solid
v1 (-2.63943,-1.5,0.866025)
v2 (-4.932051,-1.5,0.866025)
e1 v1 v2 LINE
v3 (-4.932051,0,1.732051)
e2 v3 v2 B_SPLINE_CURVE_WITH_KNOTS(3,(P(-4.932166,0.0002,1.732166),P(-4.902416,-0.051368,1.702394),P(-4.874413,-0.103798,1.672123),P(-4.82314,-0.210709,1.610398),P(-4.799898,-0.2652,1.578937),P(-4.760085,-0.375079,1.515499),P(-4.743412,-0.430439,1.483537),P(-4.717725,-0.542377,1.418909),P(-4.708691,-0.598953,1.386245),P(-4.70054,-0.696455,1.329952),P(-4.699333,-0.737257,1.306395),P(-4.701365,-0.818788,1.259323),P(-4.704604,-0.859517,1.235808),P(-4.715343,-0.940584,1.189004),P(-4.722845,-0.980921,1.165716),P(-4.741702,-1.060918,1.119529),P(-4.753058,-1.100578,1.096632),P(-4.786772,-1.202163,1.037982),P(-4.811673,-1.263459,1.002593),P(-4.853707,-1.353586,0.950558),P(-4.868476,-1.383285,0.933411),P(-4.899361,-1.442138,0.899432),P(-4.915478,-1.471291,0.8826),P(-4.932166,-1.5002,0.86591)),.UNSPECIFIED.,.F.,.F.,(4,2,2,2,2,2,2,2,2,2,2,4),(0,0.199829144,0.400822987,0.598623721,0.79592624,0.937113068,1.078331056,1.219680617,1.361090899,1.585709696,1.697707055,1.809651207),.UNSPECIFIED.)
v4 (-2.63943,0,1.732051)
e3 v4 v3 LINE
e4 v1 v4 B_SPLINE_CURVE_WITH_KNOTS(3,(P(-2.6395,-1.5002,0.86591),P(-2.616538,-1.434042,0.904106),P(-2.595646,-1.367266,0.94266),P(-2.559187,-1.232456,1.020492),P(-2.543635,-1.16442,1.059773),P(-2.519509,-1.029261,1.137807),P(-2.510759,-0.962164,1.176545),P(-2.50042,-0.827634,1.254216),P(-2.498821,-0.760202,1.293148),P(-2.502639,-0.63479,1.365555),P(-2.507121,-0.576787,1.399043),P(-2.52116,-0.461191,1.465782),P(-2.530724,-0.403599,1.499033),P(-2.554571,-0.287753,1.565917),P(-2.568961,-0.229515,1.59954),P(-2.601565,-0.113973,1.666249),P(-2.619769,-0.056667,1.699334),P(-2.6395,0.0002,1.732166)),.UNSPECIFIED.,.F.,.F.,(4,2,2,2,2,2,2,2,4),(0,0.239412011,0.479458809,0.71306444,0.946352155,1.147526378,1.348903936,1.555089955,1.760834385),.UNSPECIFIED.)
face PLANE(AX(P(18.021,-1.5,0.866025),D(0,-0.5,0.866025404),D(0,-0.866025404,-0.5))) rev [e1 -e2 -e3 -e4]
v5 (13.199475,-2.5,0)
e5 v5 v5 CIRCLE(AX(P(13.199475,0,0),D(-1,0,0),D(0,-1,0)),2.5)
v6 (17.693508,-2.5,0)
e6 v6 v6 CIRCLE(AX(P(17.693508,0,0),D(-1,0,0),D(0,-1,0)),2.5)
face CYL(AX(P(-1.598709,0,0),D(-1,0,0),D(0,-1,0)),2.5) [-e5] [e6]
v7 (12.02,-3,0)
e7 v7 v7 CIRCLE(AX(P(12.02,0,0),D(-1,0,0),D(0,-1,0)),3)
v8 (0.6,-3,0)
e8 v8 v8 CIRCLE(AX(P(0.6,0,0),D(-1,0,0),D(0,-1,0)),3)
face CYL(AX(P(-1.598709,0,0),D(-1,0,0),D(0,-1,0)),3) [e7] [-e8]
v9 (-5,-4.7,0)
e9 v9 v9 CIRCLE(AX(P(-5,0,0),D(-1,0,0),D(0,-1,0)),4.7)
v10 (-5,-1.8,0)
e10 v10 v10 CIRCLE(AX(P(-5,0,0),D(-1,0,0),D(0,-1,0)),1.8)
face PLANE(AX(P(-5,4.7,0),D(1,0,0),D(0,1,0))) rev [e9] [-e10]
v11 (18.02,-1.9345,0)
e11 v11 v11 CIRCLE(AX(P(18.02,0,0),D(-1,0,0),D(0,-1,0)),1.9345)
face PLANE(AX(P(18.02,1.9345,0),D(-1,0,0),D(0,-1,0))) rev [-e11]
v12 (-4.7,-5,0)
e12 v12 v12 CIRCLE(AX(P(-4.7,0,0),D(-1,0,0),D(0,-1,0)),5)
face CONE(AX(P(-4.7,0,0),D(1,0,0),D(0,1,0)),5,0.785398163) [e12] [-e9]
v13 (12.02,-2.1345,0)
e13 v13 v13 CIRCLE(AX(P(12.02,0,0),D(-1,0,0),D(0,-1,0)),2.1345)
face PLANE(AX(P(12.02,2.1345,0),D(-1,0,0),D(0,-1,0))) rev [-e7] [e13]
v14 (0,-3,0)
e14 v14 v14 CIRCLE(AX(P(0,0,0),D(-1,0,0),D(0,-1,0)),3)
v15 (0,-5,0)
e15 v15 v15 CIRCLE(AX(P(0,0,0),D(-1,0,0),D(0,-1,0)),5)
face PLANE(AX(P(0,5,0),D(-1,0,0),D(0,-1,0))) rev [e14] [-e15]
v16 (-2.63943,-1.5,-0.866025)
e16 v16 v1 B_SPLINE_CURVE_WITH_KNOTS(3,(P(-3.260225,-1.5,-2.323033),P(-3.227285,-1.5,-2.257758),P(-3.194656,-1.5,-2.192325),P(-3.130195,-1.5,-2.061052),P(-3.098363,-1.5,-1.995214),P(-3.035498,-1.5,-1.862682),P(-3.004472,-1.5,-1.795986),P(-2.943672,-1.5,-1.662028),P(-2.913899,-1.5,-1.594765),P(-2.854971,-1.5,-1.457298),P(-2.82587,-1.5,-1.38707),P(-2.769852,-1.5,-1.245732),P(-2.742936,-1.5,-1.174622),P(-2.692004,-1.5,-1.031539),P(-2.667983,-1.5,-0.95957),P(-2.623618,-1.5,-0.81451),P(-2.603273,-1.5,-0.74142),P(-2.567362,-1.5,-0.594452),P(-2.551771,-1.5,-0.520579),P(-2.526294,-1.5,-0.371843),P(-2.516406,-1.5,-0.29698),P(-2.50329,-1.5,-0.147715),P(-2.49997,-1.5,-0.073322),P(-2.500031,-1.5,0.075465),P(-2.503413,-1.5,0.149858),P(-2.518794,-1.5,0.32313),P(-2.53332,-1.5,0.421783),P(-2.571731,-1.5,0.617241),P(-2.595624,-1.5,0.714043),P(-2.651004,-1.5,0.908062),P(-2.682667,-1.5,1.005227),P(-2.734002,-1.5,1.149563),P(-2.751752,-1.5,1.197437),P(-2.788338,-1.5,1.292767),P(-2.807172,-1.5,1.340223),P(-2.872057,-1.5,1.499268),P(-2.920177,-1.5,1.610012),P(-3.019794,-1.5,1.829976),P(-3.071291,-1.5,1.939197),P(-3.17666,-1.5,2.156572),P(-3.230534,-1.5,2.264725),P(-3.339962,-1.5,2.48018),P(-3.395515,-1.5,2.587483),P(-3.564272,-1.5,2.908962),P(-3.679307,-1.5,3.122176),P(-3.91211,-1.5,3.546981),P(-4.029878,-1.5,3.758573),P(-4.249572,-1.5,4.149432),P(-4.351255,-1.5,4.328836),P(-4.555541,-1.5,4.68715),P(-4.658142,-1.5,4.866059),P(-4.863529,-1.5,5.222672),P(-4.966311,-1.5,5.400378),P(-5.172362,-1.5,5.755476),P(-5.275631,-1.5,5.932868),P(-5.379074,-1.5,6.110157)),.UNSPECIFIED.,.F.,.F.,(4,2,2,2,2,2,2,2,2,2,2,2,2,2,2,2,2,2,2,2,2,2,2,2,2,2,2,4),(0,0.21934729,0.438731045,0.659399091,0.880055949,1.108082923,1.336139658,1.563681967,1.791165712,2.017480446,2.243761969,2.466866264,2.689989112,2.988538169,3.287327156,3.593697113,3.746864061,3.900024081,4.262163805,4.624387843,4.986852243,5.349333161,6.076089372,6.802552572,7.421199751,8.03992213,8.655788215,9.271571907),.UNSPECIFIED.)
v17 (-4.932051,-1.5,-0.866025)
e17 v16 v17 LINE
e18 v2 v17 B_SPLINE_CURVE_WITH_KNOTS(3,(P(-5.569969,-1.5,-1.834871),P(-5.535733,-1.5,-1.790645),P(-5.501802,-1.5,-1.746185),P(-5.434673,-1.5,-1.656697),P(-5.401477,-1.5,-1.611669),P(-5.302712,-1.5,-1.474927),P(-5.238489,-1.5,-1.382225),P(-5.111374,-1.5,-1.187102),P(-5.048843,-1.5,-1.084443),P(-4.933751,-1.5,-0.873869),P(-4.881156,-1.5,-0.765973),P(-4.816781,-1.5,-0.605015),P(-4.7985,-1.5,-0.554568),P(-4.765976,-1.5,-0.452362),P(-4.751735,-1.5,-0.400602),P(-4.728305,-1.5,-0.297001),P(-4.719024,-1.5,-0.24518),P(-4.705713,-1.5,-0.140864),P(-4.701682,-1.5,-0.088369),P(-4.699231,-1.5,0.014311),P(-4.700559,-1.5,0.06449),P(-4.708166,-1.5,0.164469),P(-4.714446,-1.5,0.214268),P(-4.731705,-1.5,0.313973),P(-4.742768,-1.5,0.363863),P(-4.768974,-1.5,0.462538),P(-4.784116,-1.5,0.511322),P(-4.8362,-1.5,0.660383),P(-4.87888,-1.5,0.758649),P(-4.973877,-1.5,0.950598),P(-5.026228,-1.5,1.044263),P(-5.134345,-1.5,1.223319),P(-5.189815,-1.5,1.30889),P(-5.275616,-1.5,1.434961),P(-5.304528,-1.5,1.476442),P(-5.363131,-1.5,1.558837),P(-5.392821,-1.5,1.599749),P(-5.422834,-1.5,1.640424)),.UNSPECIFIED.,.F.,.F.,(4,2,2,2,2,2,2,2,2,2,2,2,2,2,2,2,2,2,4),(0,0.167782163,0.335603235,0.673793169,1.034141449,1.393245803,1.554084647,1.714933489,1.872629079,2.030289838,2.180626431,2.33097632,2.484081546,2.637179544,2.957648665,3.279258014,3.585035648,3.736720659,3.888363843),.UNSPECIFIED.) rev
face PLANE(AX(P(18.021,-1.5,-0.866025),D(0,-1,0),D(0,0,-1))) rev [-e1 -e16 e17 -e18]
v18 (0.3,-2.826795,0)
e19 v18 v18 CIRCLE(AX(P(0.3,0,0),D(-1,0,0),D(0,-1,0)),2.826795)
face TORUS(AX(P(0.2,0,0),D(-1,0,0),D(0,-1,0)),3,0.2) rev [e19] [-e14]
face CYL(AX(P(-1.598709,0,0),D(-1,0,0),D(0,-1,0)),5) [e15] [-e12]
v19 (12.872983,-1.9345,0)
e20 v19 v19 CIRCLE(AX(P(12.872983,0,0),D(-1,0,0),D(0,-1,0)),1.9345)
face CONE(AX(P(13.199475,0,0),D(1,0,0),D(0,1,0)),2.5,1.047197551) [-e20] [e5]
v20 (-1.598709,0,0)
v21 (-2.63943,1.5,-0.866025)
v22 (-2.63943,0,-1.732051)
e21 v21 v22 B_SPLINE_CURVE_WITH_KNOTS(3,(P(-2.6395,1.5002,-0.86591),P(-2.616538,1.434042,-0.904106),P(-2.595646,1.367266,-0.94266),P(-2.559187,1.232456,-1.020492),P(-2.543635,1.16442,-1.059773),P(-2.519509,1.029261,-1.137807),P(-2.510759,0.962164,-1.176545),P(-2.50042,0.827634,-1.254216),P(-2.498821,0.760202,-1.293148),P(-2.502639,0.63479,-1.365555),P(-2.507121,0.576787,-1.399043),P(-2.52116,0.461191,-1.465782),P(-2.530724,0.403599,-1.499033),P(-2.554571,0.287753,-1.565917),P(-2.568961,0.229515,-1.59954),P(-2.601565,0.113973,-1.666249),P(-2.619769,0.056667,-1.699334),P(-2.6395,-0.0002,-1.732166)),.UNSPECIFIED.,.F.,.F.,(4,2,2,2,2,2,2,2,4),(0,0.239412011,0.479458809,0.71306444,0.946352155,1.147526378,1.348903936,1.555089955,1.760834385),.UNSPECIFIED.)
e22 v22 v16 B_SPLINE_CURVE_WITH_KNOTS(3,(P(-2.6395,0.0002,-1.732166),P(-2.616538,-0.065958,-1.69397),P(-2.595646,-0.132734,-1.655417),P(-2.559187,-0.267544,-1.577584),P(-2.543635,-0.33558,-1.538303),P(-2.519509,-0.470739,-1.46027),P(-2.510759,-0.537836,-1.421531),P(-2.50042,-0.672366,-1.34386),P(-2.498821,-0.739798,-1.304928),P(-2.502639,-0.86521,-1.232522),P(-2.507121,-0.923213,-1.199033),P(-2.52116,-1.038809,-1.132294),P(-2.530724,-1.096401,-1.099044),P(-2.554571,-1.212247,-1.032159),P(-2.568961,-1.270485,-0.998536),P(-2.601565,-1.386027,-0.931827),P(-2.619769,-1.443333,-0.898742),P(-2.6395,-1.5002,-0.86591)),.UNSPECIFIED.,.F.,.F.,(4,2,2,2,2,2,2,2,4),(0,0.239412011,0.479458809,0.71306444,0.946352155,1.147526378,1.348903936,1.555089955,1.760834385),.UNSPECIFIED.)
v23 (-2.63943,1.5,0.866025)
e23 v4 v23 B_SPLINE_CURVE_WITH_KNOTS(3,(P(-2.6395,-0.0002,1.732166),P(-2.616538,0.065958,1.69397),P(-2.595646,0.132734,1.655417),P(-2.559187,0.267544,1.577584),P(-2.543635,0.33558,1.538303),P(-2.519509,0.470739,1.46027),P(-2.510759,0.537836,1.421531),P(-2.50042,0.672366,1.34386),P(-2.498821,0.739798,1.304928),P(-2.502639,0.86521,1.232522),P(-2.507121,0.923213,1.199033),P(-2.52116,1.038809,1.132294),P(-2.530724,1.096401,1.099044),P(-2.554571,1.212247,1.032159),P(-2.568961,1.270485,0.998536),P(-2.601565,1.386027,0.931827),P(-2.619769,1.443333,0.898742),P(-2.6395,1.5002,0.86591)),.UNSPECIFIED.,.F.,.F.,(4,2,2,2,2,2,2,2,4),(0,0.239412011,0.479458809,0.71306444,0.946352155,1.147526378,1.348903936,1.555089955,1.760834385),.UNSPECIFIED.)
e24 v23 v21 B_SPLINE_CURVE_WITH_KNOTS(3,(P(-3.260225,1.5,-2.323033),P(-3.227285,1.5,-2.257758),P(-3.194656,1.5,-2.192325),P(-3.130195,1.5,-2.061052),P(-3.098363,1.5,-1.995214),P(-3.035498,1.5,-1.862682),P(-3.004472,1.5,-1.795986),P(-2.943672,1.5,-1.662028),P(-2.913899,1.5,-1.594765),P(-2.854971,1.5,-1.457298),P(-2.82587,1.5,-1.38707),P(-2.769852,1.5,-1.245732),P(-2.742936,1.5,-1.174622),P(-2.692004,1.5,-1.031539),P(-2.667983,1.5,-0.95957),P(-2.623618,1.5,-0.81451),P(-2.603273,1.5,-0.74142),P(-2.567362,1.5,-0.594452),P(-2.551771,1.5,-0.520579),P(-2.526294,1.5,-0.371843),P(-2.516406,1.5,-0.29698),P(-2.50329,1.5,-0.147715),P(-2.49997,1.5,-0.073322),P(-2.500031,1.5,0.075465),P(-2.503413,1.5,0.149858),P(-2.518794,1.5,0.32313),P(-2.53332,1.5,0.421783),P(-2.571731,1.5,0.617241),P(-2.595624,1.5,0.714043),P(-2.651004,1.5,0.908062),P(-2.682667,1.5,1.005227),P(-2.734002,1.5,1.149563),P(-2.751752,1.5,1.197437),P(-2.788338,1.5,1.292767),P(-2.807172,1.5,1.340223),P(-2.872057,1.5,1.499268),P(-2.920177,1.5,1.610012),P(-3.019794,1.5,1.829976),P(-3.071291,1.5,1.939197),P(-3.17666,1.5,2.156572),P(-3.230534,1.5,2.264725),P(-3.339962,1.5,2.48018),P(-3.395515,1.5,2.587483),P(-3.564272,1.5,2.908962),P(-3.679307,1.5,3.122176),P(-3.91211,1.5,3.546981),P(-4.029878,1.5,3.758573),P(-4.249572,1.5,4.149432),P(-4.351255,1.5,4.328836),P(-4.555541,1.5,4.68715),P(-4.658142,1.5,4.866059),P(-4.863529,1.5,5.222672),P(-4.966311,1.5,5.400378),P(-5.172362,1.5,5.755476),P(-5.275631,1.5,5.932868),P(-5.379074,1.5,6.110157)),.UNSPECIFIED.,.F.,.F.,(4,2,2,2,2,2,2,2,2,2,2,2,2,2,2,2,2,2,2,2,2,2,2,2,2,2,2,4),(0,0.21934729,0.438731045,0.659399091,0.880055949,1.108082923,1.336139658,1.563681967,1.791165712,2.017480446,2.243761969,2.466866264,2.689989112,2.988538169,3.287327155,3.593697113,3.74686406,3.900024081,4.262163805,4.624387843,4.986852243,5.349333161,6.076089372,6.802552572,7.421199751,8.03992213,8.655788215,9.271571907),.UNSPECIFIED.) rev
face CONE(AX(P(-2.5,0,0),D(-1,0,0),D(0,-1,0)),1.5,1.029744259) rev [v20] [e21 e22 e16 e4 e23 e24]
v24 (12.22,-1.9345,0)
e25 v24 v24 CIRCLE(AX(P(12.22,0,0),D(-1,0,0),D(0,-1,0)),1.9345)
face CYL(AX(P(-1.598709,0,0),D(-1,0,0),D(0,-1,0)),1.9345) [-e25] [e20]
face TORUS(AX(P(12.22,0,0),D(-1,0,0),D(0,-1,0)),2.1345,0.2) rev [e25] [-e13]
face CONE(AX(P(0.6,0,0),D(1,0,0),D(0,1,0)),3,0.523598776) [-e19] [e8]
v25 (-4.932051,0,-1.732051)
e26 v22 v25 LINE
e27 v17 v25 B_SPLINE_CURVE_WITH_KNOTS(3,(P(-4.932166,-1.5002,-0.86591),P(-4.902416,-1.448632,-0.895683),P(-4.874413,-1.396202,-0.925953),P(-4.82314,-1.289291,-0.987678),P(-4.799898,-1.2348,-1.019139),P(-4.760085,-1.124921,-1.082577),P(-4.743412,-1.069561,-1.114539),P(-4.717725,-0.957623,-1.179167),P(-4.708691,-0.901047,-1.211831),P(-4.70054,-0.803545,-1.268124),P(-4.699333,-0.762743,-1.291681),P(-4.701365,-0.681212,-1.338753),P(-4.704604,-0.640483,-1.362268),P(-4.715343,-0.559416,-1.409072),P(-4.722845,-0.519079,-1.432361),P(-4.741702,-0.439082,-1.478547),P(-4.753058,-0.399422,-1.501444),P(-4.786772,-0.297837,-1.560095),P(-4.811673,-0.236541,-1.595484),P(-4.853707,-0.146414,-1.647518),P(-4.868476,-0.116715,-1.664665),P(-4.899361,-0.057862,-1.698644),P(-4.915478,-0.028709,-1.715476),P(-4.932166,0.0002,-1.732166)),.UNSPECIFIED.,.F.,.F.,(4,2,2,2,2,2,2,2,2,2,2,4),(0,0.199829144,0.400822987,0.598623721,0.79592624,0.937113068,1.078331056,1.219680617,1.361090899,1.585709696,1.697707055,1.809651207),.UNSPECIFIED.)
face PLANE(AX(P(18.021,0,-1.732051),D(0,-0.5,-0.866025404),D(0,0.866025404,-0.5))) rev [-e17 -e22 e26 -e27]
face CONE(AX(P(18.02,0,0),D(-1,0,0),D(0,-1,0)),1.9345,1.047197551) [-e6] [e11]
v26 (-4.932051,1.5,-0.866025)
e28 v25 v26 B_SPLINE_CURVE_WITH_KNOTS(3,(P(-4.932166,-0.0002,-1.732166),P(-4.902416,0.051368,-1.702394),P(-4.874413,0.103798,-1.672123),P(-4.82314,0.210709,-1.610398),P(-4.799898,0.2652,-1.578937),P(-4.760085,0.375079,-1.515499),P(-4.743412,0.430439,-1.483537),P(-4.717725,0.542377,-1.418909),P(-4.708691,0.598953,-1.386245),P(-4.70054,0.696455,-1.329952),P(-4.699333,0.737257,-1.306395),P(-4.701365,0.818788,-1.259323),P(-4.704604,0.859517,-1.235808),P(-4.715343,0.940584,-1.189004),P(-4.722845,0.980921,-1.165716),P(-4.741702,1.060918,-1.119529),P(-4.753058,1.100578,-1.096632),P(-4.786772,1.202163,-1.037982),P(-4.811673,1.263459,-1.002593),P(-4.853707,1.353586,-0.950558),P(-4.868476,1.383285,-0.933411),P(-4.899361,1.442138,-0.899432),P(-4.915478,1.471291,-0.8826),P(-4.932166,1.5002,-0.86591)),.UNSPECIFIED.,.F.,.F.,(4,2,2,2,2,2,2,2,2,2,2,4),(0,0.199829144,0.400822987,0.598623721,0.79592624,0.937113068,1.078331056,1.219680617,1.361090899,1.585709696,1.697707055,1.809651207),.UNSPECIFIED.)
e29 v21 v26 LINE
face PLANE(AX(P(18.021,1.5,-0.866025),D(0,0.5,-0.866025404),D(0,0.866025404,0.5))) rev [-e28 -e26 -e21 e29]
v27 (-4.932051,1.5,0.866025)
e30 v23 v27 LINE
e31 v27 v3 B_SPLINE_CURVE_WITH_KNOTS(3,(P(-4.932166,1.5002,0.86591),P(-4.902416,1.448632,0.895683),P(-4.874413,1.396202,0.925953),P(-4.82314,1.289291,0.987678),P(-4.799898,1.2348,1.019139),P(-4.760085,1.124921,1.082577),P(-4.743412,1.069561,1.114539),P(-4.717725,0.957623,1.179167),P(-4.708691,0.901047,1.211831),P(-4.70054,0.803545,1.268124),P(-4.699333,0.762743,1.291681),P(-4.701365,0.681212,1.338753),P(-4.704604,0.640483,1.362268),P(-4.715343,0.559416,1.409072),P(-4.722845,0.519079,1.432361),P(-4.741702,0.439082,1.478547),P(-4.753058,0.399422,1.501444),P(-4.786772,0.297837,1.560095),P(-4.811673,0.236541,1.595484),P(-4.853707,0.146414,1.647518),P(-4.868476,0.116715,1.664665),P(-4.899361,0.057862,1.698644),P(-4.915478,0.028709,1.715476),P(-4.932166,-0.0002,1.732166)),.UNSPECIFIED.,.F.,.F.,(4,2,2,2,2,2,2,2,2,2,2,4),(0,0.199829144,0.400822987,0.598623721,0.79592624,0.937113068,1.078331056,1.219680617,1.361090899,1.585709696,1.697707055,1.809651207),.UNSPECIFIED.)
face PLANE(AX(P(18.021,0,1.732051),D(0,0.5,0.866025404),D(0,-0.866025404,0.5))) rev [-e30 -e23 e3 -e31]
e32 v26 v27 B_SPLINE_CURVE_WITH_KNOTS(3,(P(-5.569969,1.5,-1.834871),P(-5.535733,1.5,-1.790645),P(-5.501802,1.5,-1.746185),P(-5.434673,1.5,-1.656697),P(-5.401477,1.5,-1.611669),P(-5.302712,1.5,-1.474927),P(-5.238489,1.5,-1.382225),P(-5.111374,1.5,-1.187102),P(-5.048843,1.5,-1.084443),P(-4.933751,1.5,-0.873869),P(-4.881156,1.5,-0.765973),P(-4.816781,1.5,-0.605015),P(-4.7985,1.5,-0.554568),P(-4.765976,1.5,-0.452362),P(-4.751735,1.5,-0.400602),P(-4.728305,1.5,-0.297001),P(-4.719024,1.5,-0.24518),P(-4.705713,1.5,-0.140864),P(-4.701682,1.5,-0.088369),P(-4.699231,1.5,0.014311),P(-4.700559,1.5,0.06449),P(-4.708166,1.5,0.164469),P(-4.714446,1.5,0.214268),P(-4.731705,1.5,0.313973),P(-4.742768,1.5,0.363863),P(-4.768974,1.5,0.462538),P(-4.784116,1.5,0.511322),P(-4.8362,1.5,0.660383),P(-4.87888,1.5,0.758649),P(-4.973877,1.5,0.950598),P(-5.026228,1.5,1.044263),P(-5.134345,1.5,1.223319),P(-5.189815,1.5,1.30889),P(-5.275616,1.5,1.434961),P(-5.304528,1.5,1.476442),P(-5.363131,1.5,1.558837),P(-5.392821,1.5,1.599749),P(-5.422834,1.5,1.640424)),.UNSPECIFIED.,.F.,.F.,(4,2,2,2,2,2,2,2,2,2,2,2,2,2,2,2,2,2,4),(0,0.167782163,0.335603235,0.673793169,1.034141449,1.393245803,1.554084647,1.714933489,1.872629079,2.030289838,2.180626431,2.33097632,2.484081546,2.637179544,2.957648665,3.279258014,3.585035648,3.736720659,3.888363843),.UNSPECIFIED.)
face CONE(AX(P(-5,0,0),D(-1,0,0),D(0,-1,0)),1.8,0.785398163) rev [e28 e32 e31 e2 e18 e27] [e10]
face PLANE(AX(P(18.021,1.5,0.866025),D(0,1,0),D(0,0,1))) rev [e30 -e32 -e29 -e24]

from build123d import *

# Parameters (mm, degrees)
HEXEXTRUDE_REACH = 26.082


with BuildPart() as part:
    # Sketch2 → ScrewRevolve (revolve)
    with BuildSketch(Plane.XY):
        with BuildLine():
            Line((18.02, 1.9345), (17.693508423, 2.5))
            Line((17.693508423, 2.5), (13.199474732, 2.5))
            Line((13.199474732, 2.5), (12.872983154, 1.9345))
            Line((12.872983154, 1.9345), (12.22, 1.9345))
            ThreePointArc((12.22, 1.9345), (12.078578644, 1.993078644), (12.02, 2.1345))
            Line((12.02, 2.1345), (12.02, 3))
            Line((12.02, 3), (0.6, 3))
            Line((0.6, 3), (0.3, 2.826794919))
            ThreePointArc((0.3, 2.826794919), (0.1, 2.826794919), (0, 3))
            Line((0, 3), (0, 5))
            Line((0, 5), (-4.7, 5))
            Line((-4.7, 5), (-5, 4.7))
            Line((-5, 4.7), (-5, 1.8))
            Line((-5, 1.8), (-4.7, 1.5))
            Line((-4.7, 1.5), (-2.5, 1.5))
            Line((-2.5, 1.5), (-1.598709071, 0))
            Line((-1.598709071, 0), (18.02, 0))
            Line((18.02, 0), (18.02, 1.9345))
        make_face()
    revolve(axis=Axis((-1.598709071, 0, 0), (1, 0, 0)))

    # HexExtrude: up to this cone (the profile starts inside it)
    hexextrude_end = Plane(origin=(-5, 0, 0), z_dir=(-1, 0, 0)).offset(-3.401289929) * Cone(1.664e-06, 59.321560618, 35.643988634, align=(Align.CENTER, Align.CENTER, Align.MIN), mode=Mode.PRIVATE)
    # Sketch3 → HexExtrude (cut, up to the surface)
    with BuildSketch(Plane.ZY.offset(5), mode=Mode.PRIVATE) as hexextrude_sk1:
        Polygon((-0.866025404, 1.5), (-1.732050808, 0), (-0.866025404, -1.5), (0.866025404, -1.5), (1.732050808, 0), (0.866025404, 1.5), align=None)
    hexextrude_tool1 = extrude(hexextrude_sk1.sketch, amount=-HEXEXTRUDE_REACH, mode=Mode.PRIVATE) & hexextrude_end
    add(hexextrude_tool1.solids().sort_by_distance((-5, 0, 0))[0], mode=Mode.SUBTRACT)


solid = part.part
